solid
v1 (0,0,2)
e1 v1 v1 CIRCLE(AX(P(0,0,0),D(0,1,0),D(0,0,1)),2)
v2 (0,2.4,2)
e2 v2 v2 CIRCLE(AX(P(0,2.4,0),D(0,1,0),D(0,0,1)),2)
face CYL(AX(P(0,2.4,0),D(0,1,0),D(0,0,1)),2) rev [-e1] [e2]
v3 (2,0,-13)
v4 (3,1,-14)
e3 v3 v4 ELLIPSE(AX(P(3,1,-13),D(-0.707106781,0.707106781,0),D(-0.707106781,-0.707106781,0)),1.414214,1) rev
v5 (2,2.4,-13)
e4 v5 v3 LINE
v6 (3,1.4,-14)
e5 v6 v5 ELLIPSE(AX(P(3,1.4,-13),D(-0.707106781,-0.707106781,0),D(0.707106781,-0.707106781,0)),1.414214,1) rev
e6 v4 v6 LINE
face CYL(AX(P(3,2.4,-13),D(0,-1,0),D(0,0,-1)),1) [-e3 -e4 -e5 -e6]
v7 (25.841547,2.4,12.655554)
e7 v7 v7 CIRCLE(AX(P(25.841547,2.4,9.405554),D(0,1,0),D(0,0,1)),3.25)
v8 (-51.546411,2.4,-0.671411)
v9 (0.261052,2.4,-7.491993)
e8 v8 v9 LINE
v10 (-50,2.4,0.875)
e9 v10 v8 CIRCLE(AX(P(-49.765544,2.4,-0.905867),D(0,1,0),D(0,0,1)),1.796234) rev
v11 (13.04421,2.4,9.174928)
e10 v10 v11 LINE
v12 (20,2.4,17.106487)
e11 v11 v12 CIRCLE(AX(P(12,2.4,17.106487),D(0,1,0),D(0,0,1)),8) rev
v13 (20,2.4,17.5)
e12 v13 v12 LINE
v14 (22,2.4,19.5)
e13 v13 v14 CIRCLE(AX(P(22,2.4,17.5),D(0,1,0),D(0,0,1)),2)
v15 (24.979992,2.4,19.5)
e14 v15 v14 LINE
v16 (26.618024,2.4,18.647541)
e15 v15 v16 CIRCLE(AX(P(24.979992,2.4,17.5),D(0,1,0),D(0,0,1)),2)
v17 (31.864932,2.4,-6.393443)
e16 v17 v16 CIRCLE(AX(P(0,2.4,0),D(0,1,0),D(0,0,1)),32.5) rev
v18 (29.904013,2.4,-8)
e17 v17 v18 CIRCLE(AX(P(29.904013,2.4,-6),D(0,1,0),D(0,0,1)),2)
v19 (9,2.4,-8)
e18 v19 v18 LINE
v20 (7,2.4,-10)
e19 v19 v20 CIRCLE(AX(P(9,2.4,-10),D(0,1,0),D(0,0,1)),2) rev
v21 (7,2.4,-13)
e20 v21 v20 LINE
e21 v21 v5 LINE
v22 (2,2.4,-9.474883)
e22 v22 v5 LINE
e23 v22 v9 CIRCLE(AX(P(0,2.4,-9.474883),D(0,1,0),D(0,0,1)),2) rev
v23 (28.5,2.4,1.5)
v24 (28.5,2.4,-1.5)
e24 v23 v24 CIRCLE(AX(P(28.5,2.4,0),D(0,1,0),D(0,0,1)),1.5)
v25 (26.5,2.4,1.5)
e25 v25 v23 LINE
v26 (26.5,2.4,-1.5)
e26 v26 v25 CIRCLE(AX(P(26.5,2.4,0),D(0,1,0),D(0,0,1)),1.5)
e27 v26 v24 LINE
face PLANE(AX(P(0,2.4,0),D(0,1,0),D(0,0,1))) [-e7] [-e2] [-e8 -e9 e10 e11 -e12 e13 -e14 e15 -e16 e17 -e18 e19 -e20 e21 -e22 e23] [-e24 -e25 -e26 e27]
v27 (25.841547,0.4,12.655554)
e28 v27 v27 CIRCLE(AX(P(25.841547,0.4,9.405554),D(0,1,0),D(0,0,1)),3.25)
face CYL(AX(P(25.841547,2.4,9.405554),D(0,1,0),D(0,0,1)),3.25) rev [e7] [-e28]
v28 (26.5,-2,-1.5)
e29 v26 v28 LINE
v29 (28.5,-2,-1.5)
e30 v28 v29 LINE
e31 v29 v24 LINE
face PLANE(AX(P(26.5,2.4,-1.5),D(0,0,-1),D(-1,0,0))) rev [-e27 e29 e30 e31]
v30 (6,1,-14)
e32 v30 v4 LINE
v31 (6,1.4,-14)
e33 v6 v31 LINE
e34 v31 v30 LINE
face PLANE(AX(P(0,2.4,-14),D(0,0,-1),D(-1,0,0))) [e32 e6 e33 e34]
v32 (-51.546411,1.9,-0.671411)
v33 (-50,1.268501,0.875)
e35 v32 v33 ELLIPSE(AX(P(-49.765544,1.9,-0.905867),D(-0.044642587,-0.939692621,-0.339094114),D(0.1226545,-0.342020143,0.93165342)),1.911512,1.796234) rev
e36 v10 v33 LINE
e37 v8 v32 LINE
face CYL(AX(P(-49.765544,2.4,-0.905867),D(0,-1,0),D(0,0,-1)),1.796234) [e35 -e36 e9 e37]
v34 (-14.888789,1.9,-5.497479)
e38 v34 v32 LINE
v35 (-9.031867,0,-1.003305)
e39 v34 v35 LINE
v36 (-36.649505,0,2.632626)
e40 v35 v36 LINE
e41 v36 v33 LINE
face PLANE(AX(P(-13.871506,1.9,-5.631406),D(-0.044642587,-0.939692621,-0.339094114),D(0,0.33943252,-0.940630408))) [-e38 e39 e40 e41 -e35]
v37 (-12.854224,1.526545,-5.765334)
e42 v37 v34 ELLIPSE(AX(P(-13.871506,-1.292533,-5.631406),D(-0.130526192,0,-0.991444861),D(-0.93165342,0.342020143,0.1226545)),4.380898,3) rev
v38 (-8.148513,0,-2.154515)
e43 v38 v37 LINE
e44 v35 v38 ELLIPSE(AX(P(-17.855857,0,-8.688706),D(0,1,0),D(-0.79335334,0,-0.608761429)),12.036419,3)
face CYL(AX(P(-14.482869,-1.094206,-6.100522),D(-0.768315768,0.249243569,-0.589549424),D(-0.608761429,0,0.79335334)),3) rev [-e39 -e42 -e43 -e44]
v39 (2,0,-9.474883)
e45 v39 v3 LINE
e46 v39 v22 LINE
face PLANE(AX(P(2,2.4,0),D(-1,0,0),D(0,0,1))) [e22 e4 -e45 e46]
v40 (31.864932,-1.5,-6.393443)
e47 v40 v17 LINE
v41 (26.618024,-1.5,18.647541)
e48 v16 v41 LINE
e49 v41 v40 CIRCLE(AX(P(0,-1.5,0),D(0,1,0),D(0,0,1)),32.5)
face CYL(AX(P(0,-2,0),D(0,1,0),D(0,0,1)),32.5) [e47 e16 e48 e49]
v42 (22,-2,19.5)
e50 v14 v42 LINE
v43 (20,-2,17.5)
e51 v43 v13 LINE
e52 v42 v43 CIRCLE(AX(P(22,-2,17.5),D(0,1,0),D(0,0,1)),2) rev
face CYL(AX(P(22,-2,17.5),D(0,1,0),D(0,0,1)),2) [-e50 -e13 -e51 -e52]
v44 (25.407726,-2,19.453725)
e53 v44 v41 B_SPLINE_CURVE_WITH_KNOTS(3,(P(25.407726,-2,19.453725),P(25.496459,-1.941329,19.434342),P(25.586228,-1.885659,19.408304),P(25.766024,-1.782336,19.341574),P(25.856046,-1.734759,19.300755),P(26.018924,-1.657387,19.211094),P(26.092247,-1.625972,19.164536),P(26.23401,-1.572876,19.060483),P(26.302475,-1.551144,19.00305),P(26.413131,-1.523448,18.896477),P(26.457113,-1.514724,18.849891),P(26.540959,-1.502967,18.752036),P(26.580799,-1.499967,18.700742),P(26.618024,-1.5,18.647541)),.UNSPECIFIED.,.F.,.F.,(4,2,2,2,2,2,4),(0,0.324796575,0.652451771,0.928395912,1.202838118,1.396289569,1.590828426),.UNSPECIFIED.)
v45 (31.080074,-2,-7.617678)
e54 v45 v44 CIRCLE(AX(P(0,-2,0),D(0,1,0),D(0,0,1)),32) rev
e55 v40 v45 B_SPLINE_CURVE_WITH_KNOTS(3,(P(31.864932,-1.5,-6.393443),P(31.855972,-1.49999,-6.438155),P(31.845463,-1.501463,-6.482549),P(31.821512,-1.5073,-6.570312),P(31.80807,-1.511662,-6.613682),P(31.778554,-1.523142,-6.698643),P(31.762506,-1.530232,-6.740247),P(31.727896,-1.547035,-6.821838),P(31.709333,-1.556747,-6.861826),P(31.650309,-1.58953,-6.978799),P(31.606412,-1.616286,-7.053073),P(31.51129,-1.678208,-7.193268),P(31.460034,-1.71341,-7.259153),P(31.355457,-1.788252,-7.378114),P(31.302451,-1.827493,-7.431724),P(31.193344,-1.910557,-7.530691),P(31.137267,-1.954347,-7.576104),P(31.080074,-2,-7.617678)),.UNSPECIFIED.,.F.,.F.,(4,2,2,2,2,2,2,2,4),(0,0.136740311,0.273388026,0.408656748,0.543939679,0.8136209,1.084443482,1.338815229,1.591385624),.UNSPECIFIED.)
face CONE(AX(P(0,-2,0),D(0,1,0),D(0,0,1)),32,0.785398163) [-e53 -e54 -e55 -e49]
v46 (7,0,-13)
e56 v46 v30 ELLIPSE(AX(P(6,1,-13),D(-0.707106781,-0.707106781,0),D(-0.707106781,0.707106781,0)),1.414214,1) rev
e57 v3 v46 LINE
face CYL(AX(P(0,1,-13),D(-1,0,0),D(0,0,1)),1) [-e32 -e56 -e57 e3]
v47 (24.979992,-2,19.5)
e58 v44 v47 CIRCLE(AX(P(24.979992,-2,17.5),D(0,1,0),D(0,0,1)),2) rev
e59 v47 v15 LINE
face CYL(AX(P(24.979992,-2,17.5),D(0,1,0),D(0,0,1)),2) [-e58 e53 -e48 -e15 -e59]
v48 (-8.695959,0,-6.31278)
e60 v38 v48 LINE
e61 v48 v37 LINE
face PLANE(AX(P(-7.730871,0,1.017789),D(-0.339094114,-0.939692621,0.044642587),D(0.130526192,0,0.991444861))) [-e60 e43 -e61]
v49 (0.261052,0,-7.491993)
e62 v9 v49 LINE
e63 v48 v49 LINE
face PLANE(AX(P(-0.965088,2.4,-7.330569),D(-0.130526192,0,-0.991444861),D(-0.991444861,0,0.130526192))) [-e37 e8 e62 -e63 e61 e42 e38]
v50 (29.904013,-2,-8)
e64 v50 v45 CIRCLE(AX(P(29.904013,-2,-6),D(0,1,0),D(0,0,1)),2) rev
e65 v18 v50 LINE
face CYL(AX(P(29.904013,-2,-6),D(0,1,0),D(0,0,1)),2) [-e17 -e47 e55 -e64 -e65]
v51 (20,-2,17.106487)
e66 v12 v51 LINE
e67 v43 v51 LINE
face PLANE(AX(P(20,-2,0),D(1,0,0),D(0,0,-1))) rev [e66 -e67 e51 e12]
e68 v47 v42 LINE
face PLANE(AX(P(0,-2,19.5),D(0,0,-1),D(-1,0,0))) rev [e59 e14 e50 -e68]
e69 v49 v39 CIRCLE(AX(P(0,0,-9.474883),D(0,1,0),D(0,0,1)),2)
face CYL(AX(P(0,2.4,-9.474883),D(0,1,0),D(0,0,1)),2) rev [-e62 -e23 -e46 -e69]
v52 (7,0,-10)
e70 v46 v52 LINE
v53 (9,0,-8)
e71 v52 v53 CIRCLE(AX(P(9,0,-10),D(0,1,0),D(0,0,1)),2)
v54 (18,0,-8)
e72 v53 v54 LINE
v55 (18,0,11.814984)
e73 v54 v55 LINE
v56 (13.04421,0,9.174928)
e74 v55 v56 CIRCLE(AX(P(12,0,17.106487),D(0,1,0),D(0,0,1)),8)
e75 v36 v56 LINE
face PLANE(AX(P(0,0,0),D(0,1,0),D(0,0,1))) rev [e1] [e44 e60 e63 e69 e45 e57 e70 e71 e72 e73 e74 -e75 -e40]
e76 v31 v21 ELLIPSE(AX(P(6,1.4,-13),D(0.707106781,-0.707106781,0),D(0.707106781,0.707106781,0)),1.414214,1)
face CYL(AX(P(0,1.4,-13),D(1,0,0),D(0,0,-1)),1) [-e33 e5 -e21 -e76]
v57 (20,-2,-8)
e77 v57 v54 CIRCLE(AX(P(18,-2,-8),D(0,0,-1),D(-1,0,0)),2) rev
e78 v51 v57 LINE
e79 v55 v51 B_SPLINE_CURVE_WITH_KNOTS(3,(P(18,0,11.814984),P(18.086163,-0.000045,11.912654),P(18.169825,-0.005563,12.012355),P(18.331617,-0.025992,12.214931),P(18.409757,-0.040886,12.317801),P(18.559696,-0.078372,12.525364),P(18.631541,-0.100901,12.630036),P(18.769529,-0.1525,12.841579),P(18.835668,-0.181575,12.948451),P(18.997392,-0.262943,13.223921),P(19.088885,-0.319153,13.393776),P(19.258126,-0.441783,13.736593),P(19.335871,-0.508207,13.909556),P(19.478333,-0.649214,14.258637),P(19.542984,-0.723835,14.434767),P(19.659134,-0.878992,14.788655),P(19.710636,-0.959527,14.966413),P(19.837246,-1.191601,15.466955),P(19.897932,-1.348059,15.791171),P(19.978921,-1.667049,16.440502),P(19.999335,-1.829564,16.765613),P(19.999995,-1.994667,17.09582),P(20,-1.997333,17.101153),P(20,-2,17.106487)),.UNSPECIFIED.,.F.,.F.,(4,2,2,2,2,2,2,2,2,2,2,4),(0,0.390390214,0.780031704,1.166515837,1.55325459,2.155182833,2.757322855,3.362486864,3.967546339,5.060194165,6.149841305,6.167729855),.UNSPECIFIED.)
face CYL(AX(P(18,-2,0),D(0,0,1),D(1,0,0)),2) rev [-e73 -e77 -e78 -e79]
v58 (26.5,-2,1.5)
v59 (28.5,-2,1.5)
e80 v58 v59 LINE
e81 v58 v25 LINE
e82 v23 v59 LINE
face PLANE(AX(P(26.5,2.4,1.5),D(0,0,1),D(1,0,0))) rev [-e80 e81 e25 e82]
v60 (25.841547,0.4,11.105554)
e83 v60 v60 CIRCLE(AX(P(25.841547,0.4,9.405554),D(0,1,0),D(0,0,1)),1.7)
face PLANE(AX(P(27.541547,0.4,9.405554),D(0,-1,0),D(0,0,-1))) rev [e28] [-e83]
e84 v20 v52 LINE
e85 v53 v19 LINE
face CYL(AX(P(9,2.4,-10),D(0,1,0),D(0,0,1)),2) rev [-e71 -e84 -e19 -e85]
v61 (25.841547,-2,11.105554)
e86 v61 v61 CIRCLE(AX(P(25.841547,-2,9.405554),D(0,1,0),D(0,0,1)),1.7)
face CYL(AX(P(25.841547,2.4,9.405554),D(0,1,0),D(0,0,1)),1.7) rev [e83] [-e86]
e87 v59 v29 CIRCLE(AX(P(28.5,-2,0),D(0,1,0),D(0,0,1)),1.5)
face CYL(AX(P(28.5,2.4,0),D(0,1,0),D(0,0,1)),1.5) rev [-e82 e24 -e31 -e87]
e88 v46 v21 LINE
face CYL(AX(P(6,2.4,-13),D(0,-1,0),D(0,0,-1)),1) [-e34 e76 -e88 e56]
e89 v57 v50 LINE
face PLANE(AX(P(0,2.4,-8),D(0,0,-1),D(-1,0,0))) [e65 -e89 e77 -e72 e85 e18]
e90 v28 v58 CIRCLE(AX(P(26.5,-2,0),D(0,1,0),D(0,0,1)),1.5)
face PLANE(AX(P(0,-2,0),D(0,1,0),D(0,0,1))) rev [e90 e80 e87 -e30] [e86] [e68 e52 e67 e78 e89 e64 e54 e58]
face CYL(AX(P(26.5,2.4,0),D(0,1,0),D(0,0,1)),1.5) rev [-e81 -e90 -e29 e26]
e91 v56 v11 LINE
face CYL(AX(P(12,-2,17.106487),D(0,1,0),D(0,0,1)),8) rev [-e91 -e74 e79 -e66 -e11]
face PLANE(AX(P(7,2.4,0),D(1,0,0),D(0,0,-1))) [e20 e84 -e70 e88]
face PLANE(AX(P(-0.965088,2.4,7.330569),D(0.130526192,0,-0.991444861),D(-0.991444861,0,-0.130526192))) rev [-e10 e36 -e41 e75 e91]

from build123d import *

# Parameters (mm, degrees)
BOSS_EXTRUDE1_DEPTH            = 2.4
BOSS_EXTRUDE2_DEPTH            = 2.4
BOSS_EXTRUDE2_DEPTH_BACK       = 2
FILLET1_R                      = 8
FILLET2_R                      = 2
F_3_0MM_START                  = -2
F_3_0MM_DOWEL_SLOT1_DEPTH      = 4.4
F_4_0_4_DIAMETER_HOLE1_D       = 4
CBORE_FOR_M3_SHCS1_D           = 3.4
CBORE_FOR_M3_SHCS1_CBORE_D     = 6.5
CBORE_FOR_M3_SHCS1_CBORE_DEPTH = 2
FILLET5_R                      = 2
FILLET6_R                      = 1
FILLET8_R                      = 2
CUT_EXTRUDE1_DEPTH             = 38
CHAMFER2_SIZE2                 = 1.9
CHAMFER2_SIZE                  = 5.220207097
FILLET9_R                      = 3


# Read off the part's stored shape, not the designer's step: Ø3.0mm Dowel Slot1
# Some blends are built 0.0001 mm under size
with BuildPart() as part:
    # Sketch1 → Boss-Extrude1 (new body)
    with BuildSketch(Plane(origin=(0, 0, 0), x_dir=(1, 0, 0), z_dir=(0, 1, 0))):
        with BuildLine():
            Line((2, 7.720929875), (-51.546411114, 0.671411114))
            ThreePointArc((-51.546411114, 0.671411114), (-51.035673477, -0.364262362), (-50, -0.875))
            Line((-50, -0.875), (20, -10.090674831))
            Line((20, -10.090674831), (20, 8))
            Line((20, 8), (7, 8))
            Line((7, 8), (7, 14))
            Line((7, 14), (2, 14))
            Line((2, 14), (2, 7.720929875))
        make_face()
    extrude(amount=BOSS_EXTRUDE1_DEPTH)

    # Sketch1<6> → Boss-Extrude2 (add, two sides: drawn at the far end of the back side and taken through both)
    with BuildSketch(Plane(origin=(0, 0, 0), x_dir=(1, 0, 0), z_dir=(0, 1, 0)).offset(-BOSS_EXTRUDE2_DEPTH_BACK)):
        with BuildLine():
            Line((20, 8), (20, -10.090674831))
            Line((20, -10.090674831), (20, -19.5))
            Line((20, -19.5), (26, -19.5))
            ThreePointArc((26, -19.5), (31.86887196, -6.373774392), (31.5, 8))
            Line((31.5, 8), (20, 8))
        make_face()
    extrude(amount=BOSS_EXTRUDE2_DEPTH + BOSS_EXTRUDE2_DEPTH_BACK)

    # Fillet1
    fillet1_edges = [part.edges().sort_by_distance(p)[0] for p in [
        (20, 1.2, 10.090674831),
    ]]
    fillet(fillet1_edges, radius=FILLET1_R)

    # Fillet2
    fillet2_edges = [part.edges().sort_by_distance(p)[0] for p in [
        (20, 0.2, 19.5),
        (31.5, 0.2, -8),
        (26, 0.2, 19.5),
    ]]
    fillet(fillet2_edges, radius=FILLET2_R)

    # Ø3.0mm Dowel Slot1 outline → Ø3.0mm Dowel Slot1 (cut)
    with BuildSketch(Plane(origin=(0, 0, 0), x_dir=(1, 0, 0), z_dir=(0, 1, 0)).offset(F_3_0MM_START)):
        with BuildLine():
            Line((26.5, -1.5), (28.5, -1.5))
            ThreePointArc((28.5, -1.5), (30, 0), (28.5, 1.5))
            Line((28.5, 1.5), (26.5, 1.5))
            ThreePointArc((26.5, 1.5), (25, 0), (26.5, -1.5))
        make_face()
    extrude(amount=F_3_0MM_DOWEL_SLOT1_DEPTH, mode=Mode.SUBTRACT)

    # Ø4.0 (4) Diameter Hole1 (through all)
    with Locations(Plane(origin=(0, 2.4, 0), x_dir=(1, 0, 0), z_dir=(0, 1, 0))):
        with Locations((0, 0)):
            Hole(F_4_0_4_DIAMETER_HOLE1_D / 2)

    # CBORE for M3 SHCS1 (through all)
    with Locations(Plane(origin=(0, 2.4, 0), x_dir=(1, 0, 0), z_dir=(0, 1, 0))):
        with Locations((25.841547072, -9.405553941)):
            CounterBoreHole(CBORE_FOR_M3_SHCS1_D / 2, CBORE_FOR_M3_SHCS1_CBORE_D / 2, CBORE_FOR_M3_SHCS1_CBORE_DEPTH)

    # Fillet5
    fillet5_edges = [part.edges().sort_by_distance(p)[0] for p in [
        (2, 1.2, -7.720929875),
        (7, 1.2, -8),
    ]]
    fillet(fillet5_edges, radius=FILLET5_R)

    # Fillet6
    fillet6_edges = [part.edges().sort_by_distance(p)[0] for p in [
        (4.5, 0, -14),
        (2, 1.2, -14),
        (7, 1.2, -14),
        (4.5, 2.4, -14),
    ]]
    fillet(fillet6_edges, radius=FILLET6_R)

    # Chamfer1
    # the kernel refuses this chamfer: 0.5 mm, written as the material it takes off along each edge
    with BuildSketch(Plane(origin=(0, -2, 0), x_dir=(0.7609198459057782, 0, 0.6488458893348455), z_dir=(-0.6488458893348455, 0, 0.7609198459057782))) as chamfer1_piece_1:
        with BuildLine():
            Line((32.514142136, 0.514142136), (31.985857864, -0.014142136))
            Line((31.985857864, -0.014142136), (31.985857864, -0.024142136))
            ThreePointArc((31.985857864, -0.024142136), (32.242928932, -0.01), (32.5, -0.01))
            Line((32.5, -0.01), (32.51, 0))
            ThreePointArc((32.51, 0), (32.51, 0.257071068), (32.524142136, 0.514142136))
            Line((32.524142136, 0.514142136), (32.514142136, 0.514142136))
        make_face()
    revolve(axis=Axis((0, -2, 0), (0, 1, 0)), revolution_arc=57.24100759, mode=Mode.SUBTRACT)

    # Fillet8
    fillet8_edges = [part.edges().sort_by_distance(p)[0] for p in [
        (20, 0, 4.553243268),
    ]]
    fillet(fillet8_edges, radius=FILLET8_R - 0.0001)  # a hair under: the kernel refuses the full size

    # Sketch8 → Cut-Extrude1 (cut)
    with BuildSketch(Plane(origin=(-50.581323439, 0, 6.659157562), x_dir=(0, -1, 0), z_dir=(0.9914448613738104, 0, -0.13052619222005302))):
        Polygon((-1.9, 7.393823865), (0, 2.173616768), (0, 7.393823865), align=None)
    extrude(amount=CUT_EXTRUDE1_DEPTH, mode=Mode.SUBTRACT)

    # Chamfer2
    chamfer2_edges = [part.edges().sort_by_distance(p)[0] for p in [
        (-13.530819505, 0, -3.043632668),
    ]]
    chamfer2_side = [part.faces().sort_by_distance(p)[0] for p in [
        (-13.4931446, 0, -3.048592663),
    ]]
    chamfer(chamfer2_edges, length=CHAMFER2_SIZE - 0.0001, length2=CHAMFER2_SIZE2 - 0.0001, reference=chamfer2_side[0])  # a hair under: the kernel refuses the full size

    # Fillet9
    fillet9_edges = [part.edges().sort_by_distance(p)[0] for p in [
        (-10.943077395, 0.94995, -3.384176821),
    ]]
    fillet(fillet9_edges, radius=FILLET9_R)


solid = part.part
